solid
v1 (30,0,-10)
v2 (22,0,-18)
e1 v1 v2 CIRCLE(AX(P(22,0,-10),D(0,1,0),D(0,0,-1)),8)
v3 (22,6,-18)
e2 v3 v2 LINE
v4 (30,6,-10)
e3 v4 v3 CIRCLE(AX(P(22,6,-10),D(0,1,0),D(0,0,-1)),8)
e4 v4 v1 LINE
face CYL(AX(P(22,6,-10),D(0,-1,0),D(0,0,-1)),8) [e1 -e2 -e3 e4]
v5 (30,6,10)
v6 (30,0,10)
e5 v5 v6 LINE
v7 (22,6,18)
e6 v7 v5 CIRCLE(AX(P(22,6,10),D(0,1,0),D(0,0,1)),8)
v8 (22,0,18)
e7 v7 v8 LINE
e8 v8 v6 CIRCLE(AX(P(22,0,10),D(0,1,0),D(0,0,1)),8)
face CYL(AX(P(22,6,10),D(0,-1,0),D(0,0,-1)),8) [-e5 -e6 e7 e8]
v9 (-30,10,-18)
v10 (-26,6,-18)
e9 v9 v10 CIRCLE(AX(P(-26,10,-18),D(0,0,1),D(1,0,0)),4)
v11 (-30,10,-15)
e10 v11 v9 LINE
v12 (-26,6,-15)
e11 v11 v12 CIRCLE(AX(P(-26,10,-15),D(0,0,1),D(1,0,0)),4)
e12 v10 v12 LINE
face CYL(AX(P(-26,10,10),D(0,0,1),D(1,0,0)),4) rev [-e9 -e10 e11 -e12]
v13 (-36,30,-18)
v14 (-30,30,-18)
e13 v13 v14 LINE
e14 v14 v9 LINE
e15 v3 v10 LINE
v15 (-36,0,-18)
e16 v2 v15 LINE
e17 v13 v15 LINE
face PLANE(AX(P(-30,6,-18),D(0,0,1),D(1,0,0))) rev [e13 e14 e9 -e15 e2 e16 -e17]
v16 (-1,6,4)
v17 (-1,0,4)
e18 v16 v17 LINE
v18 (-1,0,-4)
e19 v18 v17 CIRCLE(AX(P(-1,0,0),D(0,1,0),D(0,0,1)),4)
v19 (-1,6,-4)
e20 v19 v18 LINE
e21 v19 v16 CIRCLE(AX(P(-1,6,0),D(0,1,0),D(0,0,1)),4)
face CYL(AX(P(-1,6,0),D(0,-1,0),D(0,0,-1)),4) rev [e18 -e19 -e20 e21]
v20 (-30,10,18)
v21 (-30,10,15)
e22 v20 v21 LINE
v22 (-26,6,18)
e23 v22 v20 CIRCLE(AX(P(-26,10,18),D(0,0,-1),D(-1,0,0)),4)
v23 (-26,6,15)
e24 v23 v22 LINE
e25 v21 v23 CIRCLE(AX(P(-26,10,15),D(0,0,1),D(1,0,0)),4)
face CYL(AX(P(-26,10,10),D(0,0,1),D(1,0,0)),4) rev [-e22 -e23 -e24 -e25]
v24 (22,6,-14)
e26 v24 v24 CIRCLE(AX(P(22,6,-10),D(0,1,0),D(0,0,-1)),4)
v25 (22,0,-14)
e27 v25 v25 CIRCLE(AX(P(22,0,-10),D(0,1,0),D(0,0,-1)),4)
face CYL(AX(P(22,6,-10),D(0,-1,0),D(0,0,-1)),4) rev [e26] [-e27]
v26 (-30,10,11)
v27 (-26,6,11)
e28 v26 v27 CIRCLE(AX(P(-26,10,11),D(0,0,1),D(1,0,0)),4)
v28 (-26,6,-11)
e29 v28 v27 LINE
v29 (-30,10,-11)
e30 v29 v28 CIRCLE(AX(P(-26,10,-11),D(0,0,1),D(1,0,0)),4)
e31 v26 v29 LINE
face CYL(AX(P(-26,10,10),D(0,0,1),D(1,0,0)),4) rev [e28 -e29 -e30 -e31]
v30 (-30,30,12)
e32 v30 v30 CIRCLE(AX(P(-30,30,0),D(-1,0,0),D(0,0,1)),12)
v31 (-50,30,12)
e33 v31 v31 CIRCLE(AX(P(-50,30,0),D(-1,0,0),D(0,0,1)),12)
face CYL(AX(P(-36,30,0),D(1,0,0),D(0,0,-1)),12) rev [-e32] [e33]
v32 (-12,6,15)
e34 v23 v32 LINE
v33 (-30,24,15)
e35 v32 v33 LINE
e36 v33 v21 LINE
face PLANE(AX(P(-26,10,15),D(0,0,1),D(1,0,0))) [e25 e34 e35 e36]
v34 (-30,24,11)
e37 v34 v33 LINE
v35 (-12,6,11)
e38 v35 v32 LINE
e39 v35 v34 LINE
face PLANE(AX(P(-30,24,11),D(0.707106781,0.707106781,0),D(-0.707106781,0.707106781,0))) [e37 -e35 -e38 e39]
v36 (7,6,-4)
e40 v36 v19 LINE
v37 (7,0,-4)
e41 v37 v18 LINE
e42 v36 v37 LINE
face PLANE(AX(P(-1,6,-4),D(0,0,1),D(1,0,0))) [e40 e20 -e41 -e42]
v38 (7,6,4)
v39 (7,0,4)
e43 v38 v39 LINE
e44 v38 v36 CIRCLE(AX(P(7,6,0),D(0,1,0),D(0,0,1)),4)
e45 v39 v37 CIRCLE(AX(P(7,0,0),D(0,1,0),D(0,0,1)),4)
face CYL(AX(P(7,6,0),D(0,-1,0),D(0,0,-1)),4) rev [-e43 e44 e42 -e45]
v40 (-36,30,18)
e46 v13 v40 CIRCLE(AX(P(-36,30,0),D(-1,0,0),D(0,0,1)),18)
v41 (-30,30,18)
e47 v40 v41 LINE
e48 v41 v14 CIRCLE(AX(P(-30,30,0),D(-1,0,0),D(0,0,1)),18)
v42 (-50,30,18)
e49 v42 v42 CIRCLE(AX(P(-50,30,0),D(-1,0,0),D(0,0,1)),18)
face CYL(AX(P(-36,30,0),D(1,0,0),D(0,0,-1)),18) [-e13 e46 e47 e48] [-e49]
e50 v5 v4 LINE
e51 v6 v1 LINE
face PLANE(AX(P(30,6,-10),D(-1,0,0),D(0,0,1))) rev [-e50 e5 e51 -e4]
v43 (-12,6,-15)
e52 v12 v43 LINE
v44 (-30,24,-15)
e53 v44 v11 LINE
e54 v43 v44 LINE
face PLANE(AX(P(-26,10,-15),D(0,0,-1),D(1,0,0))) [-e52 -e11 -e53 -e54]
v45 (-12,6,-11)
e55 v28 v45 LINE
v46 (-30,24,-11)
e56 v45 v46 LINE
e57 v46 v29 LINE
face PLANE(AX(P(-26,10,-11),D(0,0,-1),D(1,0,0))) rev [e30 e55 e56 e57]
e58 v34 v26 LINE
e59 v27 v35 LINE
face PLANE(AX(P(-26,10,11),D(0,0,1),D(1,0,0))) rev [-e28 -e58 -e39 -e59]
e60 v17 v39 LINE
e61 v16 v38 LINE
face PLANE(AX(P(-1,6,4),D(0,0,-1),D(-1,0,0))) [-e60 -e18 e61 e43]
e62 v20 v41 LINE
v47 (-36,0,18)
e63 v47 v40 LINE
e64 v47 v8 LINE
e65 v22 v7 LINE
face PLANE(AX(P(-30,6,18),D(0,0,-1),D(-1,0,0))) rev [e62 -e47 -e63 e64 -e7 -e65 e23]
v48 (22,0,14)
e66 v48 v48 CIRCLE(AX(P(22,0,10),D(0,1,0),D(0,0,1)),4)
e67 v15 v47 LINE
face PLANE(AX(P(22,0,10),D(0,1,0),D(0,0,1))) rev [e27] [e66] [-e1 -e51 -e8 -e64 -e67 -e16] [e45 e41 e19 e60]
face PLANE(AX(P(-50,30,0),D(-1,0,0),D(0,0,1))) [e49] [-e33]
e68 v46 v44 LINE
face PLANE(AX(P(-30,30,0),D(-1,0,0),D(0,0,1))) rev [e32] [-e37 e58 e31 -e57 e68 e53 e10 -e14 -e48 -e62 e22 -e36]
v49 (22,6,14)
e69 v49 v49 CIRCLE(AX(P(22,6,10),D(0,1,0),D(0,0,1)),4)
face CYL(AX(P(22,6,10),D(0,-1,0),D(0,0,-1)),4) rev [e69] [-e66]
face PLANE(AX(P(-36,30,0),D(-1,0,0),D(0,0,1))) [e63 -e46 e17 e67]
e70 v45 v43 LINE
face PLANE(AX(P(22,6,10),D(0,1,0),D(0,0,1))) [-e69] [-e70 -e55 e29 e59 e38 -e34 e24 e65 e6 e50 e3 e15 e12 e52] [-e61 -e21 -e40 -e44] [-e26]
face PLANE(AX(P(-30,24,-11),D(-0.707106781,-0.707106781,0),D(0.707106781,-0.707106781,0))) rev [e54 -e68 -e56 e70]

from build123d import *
from build123d.topology import SkipClean

# Parameters (mm, degrees)
SKETCH1_R           = 4
BOSS_EXTRUDE1_DEPTH = 6
SKETCH2_R           = 12
BOSS_EXTRUDE2_DEPTH = 6
SKETCH3_R           = 18
SKETCH3_R_2         = 12
BOSS_EXTRUDE3_DEPTH = 14
FILLET1_R           = 4
BOSS_EXTRUDE4_START = -4
BOSS_EXTRUDE4_DEPTH = 4


with BuildPart() as part:
    # Sketch1 → Boss-Extrude1 (new body)
    with BuildSketch(Plane(origin=(0, 0, 0), x_dir=(1, 0, 0), z_dir=(0, 1, 0))):
        with BuildLine():
            Line((-30, 18), (22, 18))
            ThreePointArc((22, 18), (27.656854249, 15.656854249), (30, 10))
            Line((30, 10), (30, -10))
            ThreePointArc((30, -10), (27.656854249, -15.656854249), (22, -18))
            Line((22, -18), (-30, -18))
            Line((-30, -18), (-30, 18))
        make_face()
        with Locations((22, -10)):
            Circle(SKETCH1_R, mode=Mode.SUBTRACT)
        with Locations((22, 10)):
            Circle(SKETCH1_R, mode=Mode.SUBTRACT)
        with BuildLine():
            Line((-1, 4), (7, 4))
            ThreePointArc((7, 4), (11, 0), (7, -4))
            Line((7, -4), (-1, -4))
            ThreePointArc((-1, -4), (-5, 0), (-1, 4))
        make_face(mode=Mode.SUBTRACT)
    extrude(amount=BOSS_EXTRUDE1_DEPTH)

    # Sketch2 → Boss-Extrude2 (add)
    with BuildSketch(Plane.ZY.offset(30)):
        with BuildLine():
            Line((-18, 0), (-18, 30))
            ThreePointArc((-18, 30), (0, 48), (18, 30))
            Line((18, 30), (18, 0))
            Line((18, 0), (-18, 0))
        make_face()
        with Locations((0, 30)):
            Circle(SKETCH2_R, mode=Mode.SUBTRACT)
    extrude(amount=BOSS_EXTRUDE2_DEPTH)

    # Sketch3 → Boss-Extrude3 (add)
    with SkipClean():  # the faces are left unmerged after this step: merging them gives an invalid solid
        with BuildSketch(Plane.ZY.offset(36)):
            with Locations((0, 30)):
                Circle(SKETCH3_R)
            with Locations((0, 30)):
                Circle(SKETCH3_R_2, mode=Mode.SUBTRACT)
        extrude(amount=BOSS_EXTRUDE3_DEPTH)
    add(part.part.scale(1), mode=Mode.REPLACE)  # the faces are merged on a copy

    # Fillet1
    fillet1_edges = [part.edges().sort_by_distance(p)[0] for p in [
        (-30, 6, 0),
    ]]
    fillet(fillet1_edges, radius=FILLET1_R)

    # Sketch4 → Boss-Extrude4 (add)
    with BuildSketch(Plane.XY.offset(15).offset(BOSS_EXTRUDE4_START)):
        with BuildLine():
            Line((-26, 6), (-12, 6))
            Line((-12, 6), (-30, 24))
            Line((-30, 24), (-30, 10))
            ThreePointArc((-30, 10), (-28.828427125, 7.171572875), (-26, 6))
        make_face()
    boss_extrude4 = extrude(amount=BOSS_EXTRUDE4_DEPTH)

    # Mirror1: Boss-Extrude4 across plane
    add(boss_extrude4.mirror(Plane(origin=(0, 0, 0), x_dir=(1, 0, 0), z_dir=(0, 0, -1))))


solid = part.part
